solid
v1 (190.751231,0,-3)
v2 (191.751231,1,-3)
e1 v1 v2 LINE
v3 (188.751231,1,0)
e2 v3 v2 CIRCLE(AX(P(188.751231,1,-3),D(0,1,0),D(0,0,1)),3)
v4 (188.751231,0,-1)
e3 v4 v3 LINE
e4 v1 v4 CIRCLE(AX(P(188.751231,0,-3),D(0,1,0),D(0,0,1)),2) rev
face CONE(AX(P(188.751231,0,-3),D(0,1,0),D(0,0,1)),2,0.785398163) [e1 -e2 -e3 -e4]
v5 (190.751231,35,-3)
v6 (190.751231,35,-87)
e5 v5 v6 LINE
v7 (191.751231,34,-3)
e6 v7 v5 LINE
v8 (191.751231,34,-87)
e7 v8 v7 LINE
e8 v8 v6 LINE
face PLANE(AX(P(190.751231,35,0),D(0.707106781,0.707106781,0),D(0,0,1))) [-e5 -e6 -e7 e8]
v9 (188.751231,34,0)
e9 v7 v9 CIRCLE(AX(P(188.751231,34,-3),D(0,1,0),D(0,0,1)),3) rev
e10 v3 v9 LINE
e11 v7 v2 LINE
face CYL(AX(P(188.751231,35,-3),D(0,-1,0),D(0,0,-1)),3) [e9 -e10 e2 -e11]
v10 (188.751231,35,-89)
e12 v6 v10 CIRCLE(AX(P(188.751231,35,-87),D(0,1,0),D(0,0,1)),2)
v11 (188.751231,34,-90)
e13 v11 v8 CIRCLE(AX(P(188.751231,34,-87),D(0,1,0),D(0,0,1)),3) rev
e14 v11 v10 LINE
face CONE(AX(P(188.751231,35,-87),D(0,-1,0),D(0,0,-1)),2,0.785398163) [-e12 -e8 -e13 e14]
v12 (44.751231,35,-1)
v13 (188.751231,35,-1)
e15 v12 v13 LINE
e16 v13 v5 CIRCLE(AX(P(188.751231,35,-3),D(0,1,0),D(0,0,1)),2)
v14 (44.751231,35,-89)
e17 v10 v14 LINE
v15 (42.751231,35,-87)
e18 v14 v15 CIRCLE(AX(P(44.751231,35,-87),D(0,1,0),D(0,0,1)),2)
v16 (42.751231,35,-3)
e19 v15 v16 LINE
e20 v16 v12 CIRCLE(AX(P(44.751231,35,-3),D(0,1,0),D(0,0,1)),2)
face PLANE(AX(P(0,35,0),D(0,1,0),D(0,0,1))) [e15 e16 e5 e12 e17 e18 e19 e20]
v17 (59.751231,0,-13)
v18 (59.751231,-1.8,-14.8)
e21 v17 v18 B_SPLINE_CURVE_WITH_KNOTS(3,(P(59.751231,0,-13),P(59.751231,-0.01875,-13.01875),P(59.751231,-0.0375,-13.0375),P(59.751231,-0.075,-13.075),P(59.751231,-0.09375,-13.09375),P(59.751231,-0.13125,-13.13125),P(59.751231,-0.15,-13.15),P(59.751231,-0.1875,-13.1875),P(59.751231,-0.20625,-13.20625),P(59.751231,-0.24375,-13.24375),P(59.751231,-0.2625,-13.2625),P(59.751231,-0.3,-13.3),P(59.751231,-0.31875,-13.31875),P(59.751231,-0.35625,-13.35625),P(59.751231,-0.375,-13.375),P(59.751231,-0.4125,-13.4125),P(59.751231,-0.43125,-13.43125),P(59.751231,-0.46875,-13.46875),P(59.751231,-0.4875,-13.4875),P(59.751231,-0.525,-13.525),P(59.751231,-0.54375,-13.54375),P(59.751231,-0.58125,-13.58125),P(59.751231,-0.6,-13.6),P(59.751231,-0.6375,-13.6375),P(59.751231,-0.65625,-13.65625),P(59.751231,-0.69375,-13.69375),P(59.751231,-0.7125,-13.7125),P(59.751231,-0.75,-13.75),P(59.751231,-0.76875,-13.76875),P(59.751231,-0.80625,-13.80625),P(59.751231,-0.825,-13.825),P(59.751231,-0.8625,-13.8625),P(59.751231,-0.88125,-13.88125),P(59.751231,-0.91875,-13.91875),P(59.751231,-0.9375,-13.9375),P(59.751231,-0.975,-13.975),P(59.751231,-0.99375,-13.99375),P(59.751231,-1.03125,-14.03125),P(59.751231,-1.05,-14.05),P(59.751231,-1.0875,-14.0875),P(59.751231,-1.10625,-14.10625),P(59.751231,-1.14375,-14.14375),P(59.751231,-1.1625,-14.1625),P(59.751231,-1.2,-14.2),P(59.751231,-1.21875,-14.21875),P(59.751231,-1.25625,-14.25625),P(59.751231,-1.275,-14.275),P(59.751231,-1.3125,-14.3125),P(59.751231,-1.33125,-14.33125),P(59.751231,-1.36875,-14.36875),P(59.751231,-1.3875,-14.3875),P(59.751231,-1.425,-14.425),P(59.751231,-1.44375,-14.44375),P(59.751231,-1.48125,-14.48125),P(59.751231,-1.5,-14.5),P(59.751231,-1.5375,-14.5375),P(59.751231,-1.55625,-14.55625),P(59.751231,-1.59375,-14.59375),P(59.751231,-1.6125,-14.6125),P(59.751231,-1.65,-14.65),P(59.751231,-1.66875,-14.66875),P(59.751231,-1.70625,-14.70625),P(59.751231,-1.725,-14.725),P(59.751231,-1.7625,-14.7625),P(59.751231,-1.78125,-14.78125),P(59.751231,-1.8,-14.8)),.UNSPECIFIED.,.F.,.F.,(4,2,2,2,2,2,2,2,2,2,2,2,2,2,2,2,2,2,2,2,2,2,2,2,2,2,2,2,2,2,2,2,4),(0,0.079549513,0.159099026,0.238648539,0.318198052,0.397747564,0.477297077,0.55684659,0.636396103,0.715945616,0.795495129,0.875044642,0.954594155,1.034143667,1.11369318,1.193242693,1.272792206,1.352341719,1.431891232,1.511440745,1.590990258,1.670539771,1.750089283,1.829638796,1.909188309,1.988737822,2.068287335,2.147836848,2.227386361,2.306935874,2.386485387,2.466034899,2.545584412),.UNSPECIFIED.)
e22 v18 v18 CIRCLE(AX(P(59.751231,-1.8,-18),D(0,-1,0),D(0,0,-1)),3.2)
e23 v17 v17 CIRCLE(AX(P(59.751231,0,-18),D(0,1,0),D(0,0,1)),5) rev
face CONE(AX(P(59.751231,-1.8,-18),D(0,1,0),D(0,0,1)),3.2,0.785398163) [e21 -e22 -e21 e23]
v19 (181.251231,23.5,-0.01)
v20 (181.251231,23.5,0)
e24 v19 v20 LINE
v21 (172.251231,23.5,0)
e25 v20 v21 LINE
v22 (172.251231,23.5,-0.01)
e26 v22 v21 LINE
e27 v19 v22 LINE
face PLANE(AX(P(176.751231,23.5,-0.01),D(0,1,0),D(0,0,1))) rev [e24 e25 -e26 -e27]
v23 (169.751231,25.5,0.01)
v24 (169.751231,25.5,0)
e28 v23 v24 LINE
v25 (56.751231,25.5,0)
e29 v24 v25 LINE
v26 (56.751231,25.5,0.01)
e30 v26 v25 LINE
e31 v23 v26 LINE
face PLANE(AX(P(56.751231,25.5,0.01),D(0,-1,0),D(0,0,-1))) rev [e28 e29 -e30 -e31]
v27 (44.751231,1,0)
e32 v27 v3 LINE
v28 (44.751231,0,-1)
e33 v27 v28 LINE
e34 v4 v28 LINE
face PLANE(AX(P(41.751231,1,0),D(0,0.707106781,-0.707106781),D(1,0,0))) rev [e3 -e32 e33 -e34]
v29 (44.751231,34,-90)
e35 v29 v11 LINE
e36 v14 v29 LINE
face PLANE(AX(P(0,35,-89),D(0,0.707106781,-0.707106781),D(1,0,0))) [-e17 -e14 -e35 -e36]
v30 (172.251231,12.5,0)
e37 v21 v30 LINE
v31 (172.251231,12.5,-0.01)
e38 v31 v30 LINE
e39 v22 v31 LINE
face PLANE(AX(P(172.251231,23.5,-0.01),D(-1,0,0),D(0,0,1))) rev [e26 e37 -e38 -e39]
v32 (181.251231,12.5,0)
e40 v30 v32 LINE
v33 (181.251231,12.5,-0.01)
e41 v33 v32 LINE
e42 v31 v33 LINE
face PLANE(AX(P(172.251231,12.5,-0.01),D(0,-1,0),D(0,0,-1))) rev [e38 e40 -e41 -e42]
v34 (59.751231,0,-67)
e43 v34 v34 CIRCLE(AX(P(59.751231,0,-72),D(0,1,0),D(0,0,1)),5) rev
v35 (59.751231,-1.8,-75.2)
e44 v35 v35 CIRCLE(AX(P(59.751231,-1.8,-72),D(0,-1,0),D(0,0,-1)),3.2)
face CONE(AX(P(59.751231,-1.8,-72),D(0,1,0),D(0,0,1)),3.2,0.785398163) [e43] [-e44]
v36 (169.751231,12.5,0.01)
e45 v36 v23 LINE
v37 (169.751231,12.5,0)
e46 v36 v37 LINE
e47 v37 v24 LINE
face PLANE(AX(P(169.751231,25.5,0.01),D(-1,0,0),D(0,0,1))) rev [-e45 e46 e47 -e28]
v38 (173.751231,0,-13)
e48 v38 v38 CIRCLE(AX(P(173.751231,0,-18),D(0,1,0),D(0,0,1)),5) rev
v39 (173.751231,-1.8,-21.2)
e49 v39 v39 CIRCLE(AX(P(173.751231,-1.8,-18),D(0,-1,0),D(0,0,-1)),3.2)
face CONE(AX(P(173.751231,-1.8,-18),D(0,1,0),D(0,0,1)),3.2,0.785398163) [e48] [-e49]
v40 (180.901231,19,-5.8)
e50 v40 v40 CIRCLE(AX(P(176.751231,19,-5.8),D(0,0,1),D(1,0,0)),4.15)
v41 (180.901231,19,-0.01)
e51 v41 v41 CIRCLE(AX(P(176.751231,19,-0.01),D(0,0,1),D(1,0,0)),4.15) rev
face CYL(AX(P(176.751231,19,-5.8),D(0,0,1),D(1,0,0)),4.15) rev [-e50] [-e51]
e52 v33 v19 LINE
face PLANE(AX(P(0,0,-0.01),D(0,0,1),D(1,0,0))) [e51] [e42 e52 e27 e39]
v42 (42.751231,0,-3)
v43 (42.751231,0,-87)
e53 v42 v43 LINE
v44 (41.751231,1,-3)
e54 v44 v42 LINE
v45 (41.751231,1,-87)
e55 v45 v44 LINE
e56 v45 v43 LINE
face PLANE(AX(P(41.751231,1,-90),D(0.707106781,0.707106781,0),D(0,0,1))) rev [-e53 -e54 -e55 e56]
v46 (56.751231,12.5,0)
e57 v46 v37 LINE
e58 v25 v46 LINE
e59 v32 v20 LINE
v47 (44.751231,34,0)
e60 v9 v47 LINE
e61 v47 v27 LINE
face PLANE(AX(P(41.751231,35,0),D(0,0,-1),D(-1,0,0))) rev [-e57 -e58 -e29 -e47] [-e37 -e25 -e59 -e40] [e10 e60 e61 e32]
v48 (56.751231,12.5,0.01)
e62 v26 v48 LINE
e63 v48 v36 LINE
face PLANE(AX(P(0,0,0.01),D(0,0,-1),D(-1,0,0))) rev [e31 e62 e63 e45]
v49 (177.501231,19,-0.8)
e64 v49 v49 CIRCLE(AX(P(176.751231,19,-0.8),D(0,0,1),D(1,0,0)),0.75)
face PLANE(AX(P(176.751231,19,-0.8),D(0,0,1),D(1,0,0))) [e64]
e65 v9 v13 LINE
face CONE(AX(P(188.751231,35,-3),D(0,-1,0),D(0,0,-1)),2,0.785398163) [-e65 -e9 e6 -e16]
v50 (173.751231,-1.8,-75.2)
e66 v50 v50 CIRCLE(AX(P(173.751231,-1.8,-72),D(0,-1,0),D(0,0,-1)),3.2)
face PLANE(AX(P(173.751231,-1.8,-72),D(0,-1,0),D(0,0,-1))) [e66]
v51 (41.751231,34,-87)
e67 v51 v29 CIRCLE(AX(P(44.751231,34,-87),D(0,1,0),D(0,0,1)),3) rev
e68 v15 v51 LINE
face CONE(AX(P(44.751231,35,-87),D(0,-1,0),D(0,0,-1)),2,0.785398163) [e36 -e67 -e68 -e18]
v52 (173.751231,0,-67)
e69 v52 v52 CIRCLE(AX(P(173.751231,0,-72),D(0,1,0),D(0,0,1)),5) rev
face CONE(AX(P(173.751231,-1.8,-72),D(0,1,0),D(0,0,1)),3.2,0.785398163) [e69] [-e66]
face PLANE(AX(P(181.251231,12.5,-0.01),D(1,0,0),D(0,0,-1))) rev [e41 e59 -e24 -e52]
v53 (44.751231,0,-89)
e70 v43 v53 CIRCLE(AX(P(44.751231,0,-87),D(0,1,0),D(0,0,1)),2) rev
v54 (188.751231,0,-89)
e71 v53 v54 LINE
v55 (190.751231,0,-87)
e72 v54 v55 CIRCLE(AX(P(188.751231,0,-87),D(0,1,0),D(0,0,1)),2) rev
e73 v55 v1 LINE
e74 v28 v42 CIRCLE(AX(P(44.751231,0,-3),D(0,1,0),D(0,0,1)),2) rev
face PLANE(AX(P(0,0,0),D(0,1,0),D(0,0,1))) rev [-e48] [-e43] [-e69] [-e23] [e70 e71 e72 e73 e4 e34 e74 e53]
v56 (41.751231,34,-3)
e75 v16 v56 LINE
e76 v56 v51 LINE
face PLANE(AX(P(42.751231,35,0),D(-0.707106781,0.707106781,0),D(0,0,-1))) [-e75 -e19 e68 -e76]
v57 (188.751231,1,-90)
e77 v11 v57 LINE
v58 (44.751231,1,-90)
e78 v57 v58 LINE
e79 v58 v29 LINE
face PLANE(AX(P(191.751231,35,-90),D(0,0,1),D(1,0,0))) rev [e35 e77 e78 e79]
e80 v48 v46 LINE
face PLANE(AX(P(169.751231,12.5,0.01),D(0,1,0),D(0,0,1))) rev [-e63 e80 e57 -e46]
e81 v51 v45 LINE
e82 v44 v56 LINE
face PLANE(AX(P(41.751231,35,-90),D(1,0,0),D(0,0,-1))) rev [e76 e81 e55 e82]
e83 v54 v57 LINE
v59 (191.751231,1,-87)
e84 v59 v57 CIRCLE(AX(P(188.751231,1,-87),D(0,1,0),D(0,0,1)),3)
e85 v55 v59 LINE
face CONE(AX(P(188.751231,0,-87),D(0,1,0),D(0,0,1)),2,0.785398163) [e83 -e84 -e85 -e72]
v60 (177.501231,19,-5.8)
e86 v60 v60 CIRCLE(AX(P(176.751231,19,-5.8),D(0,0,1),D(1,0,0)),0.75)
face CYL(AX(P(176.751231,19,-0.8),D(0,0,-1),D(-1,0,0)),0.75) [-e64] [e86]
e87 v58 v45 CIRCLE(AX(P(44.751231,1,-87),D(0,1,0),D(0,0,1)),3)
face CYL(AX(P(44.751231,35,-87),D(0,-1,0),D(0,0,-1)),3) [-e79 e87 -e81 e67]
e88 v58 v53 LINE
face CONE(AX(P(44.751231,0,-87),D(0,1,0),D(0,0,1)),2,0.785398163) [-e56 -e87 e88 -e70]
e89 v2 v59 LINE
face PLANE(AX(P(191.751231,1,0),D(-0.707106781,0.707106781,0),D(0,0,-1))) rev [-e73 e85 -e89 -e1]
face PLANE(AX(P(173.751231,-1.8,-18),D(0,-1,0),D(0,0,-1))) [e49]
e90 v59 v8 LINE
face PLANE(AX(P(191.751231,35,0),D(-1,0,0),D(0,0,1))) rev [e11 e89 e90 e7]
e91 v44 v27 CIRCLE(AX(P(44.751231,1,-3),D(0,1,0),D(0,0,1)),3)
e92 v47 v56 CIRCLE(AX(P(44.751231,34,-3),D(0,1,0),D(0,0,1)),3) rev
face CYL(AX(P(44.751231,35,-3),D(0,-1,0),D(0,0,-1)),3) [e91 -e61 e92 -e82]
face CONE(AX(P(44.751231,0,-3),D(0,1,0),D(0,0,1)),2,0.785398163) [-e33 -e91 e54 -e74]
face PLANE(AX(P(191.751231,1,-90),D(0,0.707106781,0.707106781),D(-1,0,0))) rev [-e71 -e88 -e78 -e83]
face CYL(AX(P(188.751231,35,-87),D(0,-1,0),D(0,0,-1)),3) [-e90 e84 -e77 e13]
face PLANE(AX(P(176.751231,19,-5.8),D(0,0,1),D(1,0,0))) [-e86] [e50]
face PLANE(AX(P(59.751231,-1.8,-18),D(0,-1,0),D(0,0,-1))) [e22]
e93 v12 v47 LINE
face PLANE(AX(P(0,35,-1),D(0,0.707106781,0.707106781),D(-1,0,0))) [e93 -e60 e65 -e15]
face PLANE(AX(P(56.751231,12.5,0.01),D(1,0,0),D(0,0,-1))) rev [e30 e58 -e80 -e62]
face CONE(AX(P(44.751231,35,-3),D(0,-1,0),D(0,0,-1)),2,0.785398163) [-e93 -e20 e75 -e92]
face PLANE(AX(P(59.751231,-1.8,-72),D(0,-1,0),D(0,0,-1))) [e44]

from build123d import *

# Parameters (mm, degrees)
SKETCH_1_W          = 150
SKETCH_1_H          = 90
EXTRUDE_1_DEPTH     = 35
SKETCH_2_R          = 5
EXTRUDE_2_DEPTH     = 1.8
FILLET_1_R          = 3
CHAMFER_1_SIZE      = 1
CHAMFER_2_SIZE      = 1.8
SKETCH_3_R          = 4.15
CUT_EXTRUDE_1_DEPTH = 5.8
SKETCH_4_R          = 0.75
EXTRUDE_3_DEPTH     = 5
CUT_EXTRUDE_2_DEPTH = 0.01
SKETCH_6_W          = 113
SKETCH_6_H          = 13
EXTRUDE_4_DEPTH     = 0.01


with BuildPart() as part:
    # 草图1 → 凸台-拉伸1 (new body)
    with BuildSketch(Plane(origin=(0, 0, 0), x_dir=(1, 0, 0), z_dir=(0, 1, 0))):
        with Locations((116.751230923, 45)):
            Rectangle(SKETCH_1_W, SKETCH_1_H)
    extrude(amount=EXTRUDE_1_DEPTH)

    # 草图2 → 凸台-拉伸2 (add)
    with BuildSketch(Plane.XZ):
        with Locations(Location((173.751230923, -18, 0), (0, 0, 90))):
            Circle(SKETCH_2_R)
        with Locations(Location((59.751230923, -18, 0), (0, 0, 90))):
            Circle(SKETCH_2_R)
        with Locations(Location((59.751230923, -72, 0), (0, 0, 90))):
            Circle(SKETCH_2_R)
        with Locations(Location((173.751230923, -72, 0), (0, 0, 90))):
            Circle(SKETCH_2_R)
    extrude(amount=EXTRUDE_2_DEPTH)

    # 圆角1
    fillet_1_edges = [part.edges().sort_by_distance(p)[0] for p in [
        (41.751230923, 17.5, -90),
        (191.751230923, 17.5, -90),
        (191.751230923, 17.5, 0),
        (41.751230923, 17.5, 0),
    ]]
    fillet(fillet_1_edges, radius=FILLET_1_R)

    # 倒角1
    chamfer_1_edges = [part.edges().sort_by_distance(p)[0] for p in [
        (191.751230923, 0, -45),
        (191.751230923, 35, -45),
        (41.751230923, 0, -45),
        (116.751230923, 0, -90),
        (116.751230923, 0, 0),
        (42.629910579, 0, -89.121320344),
        (42.629910579, 0, -0.878679656),
        (190.872551266, 0, -89.121320344),
        (190.872551266, 0, -0.878679656),
        (116.751230923, 35, 0),
        (41.751230923, 35, -45),
        (116.751230923, 35, -90),
        (42.629910579, 35, -89.121320344),
        (42.629910579, 35, -0.878679656),
        (190.872551266, 35, -89.121320344),
        (190.872551266, 35, -0.878679656),
    ]]
    chamfer(chamfer_1_edges, length=CHAMFER_1_SIZE)

    # 倒角2
    chamfer_2_edges = [part.edges().sort_by_distance(p)[0] for p in [
        (173.751230923, -1.8, -23),
        (59.751230923, -1.8, -23),
        (59.751230923, -1.8, -77),
        (173.751230923, -1.8, -77),
    ]]
    chamfer(chamfer_2_edges, length=CHAMFER_2_SIZE - 0.0001)  # a hair under: the kernel refuses the full size

    # 草图3 → 切除-拉伸1 (cut)
    with BuildSketch(Plane.XY):
        with Locations((176.751230923, 19)):
            Circle(SKETCH_3_R)
    extrude(amount=-CUT_EXTRUDE_1_DEPTH, mode=Mode.SUBTRACT)

    # 草图4 → 凸台-拉伸3 (add)
    with BuildSketch(Plane.XY.offset(-5.8)):
        with Locations((176.751230923, 19)):
            Circle(SKETCH_4_R)
    extrude(amount=EXTRUDE_3_DEPTH)

    # 草图5 → 切除-拉伸2 (cut)
    with BuildSketch(Plane.XY):
        Polygon((176.751230923, 23.5), (172.251230923, 23.5), (172.251230923, 12.5), (181.251230923, 12.5), (181.251230923, 23.5), align=None)
    extrude(amount=-CUT_EXTRUDE_2_DEPTH, mode=Mode.SUBTRACT)

    # 草图6 → 凸台-拉伸4 (add)
    with BuildSketch(Plane.XY):
        with Locations((113.251230923, 19)):
            Rectangle(SKETCH_6_W, SKETCH_6_H)
    extrude(amount=EXTRUDE_4_DEPTH)


solid = part.part
